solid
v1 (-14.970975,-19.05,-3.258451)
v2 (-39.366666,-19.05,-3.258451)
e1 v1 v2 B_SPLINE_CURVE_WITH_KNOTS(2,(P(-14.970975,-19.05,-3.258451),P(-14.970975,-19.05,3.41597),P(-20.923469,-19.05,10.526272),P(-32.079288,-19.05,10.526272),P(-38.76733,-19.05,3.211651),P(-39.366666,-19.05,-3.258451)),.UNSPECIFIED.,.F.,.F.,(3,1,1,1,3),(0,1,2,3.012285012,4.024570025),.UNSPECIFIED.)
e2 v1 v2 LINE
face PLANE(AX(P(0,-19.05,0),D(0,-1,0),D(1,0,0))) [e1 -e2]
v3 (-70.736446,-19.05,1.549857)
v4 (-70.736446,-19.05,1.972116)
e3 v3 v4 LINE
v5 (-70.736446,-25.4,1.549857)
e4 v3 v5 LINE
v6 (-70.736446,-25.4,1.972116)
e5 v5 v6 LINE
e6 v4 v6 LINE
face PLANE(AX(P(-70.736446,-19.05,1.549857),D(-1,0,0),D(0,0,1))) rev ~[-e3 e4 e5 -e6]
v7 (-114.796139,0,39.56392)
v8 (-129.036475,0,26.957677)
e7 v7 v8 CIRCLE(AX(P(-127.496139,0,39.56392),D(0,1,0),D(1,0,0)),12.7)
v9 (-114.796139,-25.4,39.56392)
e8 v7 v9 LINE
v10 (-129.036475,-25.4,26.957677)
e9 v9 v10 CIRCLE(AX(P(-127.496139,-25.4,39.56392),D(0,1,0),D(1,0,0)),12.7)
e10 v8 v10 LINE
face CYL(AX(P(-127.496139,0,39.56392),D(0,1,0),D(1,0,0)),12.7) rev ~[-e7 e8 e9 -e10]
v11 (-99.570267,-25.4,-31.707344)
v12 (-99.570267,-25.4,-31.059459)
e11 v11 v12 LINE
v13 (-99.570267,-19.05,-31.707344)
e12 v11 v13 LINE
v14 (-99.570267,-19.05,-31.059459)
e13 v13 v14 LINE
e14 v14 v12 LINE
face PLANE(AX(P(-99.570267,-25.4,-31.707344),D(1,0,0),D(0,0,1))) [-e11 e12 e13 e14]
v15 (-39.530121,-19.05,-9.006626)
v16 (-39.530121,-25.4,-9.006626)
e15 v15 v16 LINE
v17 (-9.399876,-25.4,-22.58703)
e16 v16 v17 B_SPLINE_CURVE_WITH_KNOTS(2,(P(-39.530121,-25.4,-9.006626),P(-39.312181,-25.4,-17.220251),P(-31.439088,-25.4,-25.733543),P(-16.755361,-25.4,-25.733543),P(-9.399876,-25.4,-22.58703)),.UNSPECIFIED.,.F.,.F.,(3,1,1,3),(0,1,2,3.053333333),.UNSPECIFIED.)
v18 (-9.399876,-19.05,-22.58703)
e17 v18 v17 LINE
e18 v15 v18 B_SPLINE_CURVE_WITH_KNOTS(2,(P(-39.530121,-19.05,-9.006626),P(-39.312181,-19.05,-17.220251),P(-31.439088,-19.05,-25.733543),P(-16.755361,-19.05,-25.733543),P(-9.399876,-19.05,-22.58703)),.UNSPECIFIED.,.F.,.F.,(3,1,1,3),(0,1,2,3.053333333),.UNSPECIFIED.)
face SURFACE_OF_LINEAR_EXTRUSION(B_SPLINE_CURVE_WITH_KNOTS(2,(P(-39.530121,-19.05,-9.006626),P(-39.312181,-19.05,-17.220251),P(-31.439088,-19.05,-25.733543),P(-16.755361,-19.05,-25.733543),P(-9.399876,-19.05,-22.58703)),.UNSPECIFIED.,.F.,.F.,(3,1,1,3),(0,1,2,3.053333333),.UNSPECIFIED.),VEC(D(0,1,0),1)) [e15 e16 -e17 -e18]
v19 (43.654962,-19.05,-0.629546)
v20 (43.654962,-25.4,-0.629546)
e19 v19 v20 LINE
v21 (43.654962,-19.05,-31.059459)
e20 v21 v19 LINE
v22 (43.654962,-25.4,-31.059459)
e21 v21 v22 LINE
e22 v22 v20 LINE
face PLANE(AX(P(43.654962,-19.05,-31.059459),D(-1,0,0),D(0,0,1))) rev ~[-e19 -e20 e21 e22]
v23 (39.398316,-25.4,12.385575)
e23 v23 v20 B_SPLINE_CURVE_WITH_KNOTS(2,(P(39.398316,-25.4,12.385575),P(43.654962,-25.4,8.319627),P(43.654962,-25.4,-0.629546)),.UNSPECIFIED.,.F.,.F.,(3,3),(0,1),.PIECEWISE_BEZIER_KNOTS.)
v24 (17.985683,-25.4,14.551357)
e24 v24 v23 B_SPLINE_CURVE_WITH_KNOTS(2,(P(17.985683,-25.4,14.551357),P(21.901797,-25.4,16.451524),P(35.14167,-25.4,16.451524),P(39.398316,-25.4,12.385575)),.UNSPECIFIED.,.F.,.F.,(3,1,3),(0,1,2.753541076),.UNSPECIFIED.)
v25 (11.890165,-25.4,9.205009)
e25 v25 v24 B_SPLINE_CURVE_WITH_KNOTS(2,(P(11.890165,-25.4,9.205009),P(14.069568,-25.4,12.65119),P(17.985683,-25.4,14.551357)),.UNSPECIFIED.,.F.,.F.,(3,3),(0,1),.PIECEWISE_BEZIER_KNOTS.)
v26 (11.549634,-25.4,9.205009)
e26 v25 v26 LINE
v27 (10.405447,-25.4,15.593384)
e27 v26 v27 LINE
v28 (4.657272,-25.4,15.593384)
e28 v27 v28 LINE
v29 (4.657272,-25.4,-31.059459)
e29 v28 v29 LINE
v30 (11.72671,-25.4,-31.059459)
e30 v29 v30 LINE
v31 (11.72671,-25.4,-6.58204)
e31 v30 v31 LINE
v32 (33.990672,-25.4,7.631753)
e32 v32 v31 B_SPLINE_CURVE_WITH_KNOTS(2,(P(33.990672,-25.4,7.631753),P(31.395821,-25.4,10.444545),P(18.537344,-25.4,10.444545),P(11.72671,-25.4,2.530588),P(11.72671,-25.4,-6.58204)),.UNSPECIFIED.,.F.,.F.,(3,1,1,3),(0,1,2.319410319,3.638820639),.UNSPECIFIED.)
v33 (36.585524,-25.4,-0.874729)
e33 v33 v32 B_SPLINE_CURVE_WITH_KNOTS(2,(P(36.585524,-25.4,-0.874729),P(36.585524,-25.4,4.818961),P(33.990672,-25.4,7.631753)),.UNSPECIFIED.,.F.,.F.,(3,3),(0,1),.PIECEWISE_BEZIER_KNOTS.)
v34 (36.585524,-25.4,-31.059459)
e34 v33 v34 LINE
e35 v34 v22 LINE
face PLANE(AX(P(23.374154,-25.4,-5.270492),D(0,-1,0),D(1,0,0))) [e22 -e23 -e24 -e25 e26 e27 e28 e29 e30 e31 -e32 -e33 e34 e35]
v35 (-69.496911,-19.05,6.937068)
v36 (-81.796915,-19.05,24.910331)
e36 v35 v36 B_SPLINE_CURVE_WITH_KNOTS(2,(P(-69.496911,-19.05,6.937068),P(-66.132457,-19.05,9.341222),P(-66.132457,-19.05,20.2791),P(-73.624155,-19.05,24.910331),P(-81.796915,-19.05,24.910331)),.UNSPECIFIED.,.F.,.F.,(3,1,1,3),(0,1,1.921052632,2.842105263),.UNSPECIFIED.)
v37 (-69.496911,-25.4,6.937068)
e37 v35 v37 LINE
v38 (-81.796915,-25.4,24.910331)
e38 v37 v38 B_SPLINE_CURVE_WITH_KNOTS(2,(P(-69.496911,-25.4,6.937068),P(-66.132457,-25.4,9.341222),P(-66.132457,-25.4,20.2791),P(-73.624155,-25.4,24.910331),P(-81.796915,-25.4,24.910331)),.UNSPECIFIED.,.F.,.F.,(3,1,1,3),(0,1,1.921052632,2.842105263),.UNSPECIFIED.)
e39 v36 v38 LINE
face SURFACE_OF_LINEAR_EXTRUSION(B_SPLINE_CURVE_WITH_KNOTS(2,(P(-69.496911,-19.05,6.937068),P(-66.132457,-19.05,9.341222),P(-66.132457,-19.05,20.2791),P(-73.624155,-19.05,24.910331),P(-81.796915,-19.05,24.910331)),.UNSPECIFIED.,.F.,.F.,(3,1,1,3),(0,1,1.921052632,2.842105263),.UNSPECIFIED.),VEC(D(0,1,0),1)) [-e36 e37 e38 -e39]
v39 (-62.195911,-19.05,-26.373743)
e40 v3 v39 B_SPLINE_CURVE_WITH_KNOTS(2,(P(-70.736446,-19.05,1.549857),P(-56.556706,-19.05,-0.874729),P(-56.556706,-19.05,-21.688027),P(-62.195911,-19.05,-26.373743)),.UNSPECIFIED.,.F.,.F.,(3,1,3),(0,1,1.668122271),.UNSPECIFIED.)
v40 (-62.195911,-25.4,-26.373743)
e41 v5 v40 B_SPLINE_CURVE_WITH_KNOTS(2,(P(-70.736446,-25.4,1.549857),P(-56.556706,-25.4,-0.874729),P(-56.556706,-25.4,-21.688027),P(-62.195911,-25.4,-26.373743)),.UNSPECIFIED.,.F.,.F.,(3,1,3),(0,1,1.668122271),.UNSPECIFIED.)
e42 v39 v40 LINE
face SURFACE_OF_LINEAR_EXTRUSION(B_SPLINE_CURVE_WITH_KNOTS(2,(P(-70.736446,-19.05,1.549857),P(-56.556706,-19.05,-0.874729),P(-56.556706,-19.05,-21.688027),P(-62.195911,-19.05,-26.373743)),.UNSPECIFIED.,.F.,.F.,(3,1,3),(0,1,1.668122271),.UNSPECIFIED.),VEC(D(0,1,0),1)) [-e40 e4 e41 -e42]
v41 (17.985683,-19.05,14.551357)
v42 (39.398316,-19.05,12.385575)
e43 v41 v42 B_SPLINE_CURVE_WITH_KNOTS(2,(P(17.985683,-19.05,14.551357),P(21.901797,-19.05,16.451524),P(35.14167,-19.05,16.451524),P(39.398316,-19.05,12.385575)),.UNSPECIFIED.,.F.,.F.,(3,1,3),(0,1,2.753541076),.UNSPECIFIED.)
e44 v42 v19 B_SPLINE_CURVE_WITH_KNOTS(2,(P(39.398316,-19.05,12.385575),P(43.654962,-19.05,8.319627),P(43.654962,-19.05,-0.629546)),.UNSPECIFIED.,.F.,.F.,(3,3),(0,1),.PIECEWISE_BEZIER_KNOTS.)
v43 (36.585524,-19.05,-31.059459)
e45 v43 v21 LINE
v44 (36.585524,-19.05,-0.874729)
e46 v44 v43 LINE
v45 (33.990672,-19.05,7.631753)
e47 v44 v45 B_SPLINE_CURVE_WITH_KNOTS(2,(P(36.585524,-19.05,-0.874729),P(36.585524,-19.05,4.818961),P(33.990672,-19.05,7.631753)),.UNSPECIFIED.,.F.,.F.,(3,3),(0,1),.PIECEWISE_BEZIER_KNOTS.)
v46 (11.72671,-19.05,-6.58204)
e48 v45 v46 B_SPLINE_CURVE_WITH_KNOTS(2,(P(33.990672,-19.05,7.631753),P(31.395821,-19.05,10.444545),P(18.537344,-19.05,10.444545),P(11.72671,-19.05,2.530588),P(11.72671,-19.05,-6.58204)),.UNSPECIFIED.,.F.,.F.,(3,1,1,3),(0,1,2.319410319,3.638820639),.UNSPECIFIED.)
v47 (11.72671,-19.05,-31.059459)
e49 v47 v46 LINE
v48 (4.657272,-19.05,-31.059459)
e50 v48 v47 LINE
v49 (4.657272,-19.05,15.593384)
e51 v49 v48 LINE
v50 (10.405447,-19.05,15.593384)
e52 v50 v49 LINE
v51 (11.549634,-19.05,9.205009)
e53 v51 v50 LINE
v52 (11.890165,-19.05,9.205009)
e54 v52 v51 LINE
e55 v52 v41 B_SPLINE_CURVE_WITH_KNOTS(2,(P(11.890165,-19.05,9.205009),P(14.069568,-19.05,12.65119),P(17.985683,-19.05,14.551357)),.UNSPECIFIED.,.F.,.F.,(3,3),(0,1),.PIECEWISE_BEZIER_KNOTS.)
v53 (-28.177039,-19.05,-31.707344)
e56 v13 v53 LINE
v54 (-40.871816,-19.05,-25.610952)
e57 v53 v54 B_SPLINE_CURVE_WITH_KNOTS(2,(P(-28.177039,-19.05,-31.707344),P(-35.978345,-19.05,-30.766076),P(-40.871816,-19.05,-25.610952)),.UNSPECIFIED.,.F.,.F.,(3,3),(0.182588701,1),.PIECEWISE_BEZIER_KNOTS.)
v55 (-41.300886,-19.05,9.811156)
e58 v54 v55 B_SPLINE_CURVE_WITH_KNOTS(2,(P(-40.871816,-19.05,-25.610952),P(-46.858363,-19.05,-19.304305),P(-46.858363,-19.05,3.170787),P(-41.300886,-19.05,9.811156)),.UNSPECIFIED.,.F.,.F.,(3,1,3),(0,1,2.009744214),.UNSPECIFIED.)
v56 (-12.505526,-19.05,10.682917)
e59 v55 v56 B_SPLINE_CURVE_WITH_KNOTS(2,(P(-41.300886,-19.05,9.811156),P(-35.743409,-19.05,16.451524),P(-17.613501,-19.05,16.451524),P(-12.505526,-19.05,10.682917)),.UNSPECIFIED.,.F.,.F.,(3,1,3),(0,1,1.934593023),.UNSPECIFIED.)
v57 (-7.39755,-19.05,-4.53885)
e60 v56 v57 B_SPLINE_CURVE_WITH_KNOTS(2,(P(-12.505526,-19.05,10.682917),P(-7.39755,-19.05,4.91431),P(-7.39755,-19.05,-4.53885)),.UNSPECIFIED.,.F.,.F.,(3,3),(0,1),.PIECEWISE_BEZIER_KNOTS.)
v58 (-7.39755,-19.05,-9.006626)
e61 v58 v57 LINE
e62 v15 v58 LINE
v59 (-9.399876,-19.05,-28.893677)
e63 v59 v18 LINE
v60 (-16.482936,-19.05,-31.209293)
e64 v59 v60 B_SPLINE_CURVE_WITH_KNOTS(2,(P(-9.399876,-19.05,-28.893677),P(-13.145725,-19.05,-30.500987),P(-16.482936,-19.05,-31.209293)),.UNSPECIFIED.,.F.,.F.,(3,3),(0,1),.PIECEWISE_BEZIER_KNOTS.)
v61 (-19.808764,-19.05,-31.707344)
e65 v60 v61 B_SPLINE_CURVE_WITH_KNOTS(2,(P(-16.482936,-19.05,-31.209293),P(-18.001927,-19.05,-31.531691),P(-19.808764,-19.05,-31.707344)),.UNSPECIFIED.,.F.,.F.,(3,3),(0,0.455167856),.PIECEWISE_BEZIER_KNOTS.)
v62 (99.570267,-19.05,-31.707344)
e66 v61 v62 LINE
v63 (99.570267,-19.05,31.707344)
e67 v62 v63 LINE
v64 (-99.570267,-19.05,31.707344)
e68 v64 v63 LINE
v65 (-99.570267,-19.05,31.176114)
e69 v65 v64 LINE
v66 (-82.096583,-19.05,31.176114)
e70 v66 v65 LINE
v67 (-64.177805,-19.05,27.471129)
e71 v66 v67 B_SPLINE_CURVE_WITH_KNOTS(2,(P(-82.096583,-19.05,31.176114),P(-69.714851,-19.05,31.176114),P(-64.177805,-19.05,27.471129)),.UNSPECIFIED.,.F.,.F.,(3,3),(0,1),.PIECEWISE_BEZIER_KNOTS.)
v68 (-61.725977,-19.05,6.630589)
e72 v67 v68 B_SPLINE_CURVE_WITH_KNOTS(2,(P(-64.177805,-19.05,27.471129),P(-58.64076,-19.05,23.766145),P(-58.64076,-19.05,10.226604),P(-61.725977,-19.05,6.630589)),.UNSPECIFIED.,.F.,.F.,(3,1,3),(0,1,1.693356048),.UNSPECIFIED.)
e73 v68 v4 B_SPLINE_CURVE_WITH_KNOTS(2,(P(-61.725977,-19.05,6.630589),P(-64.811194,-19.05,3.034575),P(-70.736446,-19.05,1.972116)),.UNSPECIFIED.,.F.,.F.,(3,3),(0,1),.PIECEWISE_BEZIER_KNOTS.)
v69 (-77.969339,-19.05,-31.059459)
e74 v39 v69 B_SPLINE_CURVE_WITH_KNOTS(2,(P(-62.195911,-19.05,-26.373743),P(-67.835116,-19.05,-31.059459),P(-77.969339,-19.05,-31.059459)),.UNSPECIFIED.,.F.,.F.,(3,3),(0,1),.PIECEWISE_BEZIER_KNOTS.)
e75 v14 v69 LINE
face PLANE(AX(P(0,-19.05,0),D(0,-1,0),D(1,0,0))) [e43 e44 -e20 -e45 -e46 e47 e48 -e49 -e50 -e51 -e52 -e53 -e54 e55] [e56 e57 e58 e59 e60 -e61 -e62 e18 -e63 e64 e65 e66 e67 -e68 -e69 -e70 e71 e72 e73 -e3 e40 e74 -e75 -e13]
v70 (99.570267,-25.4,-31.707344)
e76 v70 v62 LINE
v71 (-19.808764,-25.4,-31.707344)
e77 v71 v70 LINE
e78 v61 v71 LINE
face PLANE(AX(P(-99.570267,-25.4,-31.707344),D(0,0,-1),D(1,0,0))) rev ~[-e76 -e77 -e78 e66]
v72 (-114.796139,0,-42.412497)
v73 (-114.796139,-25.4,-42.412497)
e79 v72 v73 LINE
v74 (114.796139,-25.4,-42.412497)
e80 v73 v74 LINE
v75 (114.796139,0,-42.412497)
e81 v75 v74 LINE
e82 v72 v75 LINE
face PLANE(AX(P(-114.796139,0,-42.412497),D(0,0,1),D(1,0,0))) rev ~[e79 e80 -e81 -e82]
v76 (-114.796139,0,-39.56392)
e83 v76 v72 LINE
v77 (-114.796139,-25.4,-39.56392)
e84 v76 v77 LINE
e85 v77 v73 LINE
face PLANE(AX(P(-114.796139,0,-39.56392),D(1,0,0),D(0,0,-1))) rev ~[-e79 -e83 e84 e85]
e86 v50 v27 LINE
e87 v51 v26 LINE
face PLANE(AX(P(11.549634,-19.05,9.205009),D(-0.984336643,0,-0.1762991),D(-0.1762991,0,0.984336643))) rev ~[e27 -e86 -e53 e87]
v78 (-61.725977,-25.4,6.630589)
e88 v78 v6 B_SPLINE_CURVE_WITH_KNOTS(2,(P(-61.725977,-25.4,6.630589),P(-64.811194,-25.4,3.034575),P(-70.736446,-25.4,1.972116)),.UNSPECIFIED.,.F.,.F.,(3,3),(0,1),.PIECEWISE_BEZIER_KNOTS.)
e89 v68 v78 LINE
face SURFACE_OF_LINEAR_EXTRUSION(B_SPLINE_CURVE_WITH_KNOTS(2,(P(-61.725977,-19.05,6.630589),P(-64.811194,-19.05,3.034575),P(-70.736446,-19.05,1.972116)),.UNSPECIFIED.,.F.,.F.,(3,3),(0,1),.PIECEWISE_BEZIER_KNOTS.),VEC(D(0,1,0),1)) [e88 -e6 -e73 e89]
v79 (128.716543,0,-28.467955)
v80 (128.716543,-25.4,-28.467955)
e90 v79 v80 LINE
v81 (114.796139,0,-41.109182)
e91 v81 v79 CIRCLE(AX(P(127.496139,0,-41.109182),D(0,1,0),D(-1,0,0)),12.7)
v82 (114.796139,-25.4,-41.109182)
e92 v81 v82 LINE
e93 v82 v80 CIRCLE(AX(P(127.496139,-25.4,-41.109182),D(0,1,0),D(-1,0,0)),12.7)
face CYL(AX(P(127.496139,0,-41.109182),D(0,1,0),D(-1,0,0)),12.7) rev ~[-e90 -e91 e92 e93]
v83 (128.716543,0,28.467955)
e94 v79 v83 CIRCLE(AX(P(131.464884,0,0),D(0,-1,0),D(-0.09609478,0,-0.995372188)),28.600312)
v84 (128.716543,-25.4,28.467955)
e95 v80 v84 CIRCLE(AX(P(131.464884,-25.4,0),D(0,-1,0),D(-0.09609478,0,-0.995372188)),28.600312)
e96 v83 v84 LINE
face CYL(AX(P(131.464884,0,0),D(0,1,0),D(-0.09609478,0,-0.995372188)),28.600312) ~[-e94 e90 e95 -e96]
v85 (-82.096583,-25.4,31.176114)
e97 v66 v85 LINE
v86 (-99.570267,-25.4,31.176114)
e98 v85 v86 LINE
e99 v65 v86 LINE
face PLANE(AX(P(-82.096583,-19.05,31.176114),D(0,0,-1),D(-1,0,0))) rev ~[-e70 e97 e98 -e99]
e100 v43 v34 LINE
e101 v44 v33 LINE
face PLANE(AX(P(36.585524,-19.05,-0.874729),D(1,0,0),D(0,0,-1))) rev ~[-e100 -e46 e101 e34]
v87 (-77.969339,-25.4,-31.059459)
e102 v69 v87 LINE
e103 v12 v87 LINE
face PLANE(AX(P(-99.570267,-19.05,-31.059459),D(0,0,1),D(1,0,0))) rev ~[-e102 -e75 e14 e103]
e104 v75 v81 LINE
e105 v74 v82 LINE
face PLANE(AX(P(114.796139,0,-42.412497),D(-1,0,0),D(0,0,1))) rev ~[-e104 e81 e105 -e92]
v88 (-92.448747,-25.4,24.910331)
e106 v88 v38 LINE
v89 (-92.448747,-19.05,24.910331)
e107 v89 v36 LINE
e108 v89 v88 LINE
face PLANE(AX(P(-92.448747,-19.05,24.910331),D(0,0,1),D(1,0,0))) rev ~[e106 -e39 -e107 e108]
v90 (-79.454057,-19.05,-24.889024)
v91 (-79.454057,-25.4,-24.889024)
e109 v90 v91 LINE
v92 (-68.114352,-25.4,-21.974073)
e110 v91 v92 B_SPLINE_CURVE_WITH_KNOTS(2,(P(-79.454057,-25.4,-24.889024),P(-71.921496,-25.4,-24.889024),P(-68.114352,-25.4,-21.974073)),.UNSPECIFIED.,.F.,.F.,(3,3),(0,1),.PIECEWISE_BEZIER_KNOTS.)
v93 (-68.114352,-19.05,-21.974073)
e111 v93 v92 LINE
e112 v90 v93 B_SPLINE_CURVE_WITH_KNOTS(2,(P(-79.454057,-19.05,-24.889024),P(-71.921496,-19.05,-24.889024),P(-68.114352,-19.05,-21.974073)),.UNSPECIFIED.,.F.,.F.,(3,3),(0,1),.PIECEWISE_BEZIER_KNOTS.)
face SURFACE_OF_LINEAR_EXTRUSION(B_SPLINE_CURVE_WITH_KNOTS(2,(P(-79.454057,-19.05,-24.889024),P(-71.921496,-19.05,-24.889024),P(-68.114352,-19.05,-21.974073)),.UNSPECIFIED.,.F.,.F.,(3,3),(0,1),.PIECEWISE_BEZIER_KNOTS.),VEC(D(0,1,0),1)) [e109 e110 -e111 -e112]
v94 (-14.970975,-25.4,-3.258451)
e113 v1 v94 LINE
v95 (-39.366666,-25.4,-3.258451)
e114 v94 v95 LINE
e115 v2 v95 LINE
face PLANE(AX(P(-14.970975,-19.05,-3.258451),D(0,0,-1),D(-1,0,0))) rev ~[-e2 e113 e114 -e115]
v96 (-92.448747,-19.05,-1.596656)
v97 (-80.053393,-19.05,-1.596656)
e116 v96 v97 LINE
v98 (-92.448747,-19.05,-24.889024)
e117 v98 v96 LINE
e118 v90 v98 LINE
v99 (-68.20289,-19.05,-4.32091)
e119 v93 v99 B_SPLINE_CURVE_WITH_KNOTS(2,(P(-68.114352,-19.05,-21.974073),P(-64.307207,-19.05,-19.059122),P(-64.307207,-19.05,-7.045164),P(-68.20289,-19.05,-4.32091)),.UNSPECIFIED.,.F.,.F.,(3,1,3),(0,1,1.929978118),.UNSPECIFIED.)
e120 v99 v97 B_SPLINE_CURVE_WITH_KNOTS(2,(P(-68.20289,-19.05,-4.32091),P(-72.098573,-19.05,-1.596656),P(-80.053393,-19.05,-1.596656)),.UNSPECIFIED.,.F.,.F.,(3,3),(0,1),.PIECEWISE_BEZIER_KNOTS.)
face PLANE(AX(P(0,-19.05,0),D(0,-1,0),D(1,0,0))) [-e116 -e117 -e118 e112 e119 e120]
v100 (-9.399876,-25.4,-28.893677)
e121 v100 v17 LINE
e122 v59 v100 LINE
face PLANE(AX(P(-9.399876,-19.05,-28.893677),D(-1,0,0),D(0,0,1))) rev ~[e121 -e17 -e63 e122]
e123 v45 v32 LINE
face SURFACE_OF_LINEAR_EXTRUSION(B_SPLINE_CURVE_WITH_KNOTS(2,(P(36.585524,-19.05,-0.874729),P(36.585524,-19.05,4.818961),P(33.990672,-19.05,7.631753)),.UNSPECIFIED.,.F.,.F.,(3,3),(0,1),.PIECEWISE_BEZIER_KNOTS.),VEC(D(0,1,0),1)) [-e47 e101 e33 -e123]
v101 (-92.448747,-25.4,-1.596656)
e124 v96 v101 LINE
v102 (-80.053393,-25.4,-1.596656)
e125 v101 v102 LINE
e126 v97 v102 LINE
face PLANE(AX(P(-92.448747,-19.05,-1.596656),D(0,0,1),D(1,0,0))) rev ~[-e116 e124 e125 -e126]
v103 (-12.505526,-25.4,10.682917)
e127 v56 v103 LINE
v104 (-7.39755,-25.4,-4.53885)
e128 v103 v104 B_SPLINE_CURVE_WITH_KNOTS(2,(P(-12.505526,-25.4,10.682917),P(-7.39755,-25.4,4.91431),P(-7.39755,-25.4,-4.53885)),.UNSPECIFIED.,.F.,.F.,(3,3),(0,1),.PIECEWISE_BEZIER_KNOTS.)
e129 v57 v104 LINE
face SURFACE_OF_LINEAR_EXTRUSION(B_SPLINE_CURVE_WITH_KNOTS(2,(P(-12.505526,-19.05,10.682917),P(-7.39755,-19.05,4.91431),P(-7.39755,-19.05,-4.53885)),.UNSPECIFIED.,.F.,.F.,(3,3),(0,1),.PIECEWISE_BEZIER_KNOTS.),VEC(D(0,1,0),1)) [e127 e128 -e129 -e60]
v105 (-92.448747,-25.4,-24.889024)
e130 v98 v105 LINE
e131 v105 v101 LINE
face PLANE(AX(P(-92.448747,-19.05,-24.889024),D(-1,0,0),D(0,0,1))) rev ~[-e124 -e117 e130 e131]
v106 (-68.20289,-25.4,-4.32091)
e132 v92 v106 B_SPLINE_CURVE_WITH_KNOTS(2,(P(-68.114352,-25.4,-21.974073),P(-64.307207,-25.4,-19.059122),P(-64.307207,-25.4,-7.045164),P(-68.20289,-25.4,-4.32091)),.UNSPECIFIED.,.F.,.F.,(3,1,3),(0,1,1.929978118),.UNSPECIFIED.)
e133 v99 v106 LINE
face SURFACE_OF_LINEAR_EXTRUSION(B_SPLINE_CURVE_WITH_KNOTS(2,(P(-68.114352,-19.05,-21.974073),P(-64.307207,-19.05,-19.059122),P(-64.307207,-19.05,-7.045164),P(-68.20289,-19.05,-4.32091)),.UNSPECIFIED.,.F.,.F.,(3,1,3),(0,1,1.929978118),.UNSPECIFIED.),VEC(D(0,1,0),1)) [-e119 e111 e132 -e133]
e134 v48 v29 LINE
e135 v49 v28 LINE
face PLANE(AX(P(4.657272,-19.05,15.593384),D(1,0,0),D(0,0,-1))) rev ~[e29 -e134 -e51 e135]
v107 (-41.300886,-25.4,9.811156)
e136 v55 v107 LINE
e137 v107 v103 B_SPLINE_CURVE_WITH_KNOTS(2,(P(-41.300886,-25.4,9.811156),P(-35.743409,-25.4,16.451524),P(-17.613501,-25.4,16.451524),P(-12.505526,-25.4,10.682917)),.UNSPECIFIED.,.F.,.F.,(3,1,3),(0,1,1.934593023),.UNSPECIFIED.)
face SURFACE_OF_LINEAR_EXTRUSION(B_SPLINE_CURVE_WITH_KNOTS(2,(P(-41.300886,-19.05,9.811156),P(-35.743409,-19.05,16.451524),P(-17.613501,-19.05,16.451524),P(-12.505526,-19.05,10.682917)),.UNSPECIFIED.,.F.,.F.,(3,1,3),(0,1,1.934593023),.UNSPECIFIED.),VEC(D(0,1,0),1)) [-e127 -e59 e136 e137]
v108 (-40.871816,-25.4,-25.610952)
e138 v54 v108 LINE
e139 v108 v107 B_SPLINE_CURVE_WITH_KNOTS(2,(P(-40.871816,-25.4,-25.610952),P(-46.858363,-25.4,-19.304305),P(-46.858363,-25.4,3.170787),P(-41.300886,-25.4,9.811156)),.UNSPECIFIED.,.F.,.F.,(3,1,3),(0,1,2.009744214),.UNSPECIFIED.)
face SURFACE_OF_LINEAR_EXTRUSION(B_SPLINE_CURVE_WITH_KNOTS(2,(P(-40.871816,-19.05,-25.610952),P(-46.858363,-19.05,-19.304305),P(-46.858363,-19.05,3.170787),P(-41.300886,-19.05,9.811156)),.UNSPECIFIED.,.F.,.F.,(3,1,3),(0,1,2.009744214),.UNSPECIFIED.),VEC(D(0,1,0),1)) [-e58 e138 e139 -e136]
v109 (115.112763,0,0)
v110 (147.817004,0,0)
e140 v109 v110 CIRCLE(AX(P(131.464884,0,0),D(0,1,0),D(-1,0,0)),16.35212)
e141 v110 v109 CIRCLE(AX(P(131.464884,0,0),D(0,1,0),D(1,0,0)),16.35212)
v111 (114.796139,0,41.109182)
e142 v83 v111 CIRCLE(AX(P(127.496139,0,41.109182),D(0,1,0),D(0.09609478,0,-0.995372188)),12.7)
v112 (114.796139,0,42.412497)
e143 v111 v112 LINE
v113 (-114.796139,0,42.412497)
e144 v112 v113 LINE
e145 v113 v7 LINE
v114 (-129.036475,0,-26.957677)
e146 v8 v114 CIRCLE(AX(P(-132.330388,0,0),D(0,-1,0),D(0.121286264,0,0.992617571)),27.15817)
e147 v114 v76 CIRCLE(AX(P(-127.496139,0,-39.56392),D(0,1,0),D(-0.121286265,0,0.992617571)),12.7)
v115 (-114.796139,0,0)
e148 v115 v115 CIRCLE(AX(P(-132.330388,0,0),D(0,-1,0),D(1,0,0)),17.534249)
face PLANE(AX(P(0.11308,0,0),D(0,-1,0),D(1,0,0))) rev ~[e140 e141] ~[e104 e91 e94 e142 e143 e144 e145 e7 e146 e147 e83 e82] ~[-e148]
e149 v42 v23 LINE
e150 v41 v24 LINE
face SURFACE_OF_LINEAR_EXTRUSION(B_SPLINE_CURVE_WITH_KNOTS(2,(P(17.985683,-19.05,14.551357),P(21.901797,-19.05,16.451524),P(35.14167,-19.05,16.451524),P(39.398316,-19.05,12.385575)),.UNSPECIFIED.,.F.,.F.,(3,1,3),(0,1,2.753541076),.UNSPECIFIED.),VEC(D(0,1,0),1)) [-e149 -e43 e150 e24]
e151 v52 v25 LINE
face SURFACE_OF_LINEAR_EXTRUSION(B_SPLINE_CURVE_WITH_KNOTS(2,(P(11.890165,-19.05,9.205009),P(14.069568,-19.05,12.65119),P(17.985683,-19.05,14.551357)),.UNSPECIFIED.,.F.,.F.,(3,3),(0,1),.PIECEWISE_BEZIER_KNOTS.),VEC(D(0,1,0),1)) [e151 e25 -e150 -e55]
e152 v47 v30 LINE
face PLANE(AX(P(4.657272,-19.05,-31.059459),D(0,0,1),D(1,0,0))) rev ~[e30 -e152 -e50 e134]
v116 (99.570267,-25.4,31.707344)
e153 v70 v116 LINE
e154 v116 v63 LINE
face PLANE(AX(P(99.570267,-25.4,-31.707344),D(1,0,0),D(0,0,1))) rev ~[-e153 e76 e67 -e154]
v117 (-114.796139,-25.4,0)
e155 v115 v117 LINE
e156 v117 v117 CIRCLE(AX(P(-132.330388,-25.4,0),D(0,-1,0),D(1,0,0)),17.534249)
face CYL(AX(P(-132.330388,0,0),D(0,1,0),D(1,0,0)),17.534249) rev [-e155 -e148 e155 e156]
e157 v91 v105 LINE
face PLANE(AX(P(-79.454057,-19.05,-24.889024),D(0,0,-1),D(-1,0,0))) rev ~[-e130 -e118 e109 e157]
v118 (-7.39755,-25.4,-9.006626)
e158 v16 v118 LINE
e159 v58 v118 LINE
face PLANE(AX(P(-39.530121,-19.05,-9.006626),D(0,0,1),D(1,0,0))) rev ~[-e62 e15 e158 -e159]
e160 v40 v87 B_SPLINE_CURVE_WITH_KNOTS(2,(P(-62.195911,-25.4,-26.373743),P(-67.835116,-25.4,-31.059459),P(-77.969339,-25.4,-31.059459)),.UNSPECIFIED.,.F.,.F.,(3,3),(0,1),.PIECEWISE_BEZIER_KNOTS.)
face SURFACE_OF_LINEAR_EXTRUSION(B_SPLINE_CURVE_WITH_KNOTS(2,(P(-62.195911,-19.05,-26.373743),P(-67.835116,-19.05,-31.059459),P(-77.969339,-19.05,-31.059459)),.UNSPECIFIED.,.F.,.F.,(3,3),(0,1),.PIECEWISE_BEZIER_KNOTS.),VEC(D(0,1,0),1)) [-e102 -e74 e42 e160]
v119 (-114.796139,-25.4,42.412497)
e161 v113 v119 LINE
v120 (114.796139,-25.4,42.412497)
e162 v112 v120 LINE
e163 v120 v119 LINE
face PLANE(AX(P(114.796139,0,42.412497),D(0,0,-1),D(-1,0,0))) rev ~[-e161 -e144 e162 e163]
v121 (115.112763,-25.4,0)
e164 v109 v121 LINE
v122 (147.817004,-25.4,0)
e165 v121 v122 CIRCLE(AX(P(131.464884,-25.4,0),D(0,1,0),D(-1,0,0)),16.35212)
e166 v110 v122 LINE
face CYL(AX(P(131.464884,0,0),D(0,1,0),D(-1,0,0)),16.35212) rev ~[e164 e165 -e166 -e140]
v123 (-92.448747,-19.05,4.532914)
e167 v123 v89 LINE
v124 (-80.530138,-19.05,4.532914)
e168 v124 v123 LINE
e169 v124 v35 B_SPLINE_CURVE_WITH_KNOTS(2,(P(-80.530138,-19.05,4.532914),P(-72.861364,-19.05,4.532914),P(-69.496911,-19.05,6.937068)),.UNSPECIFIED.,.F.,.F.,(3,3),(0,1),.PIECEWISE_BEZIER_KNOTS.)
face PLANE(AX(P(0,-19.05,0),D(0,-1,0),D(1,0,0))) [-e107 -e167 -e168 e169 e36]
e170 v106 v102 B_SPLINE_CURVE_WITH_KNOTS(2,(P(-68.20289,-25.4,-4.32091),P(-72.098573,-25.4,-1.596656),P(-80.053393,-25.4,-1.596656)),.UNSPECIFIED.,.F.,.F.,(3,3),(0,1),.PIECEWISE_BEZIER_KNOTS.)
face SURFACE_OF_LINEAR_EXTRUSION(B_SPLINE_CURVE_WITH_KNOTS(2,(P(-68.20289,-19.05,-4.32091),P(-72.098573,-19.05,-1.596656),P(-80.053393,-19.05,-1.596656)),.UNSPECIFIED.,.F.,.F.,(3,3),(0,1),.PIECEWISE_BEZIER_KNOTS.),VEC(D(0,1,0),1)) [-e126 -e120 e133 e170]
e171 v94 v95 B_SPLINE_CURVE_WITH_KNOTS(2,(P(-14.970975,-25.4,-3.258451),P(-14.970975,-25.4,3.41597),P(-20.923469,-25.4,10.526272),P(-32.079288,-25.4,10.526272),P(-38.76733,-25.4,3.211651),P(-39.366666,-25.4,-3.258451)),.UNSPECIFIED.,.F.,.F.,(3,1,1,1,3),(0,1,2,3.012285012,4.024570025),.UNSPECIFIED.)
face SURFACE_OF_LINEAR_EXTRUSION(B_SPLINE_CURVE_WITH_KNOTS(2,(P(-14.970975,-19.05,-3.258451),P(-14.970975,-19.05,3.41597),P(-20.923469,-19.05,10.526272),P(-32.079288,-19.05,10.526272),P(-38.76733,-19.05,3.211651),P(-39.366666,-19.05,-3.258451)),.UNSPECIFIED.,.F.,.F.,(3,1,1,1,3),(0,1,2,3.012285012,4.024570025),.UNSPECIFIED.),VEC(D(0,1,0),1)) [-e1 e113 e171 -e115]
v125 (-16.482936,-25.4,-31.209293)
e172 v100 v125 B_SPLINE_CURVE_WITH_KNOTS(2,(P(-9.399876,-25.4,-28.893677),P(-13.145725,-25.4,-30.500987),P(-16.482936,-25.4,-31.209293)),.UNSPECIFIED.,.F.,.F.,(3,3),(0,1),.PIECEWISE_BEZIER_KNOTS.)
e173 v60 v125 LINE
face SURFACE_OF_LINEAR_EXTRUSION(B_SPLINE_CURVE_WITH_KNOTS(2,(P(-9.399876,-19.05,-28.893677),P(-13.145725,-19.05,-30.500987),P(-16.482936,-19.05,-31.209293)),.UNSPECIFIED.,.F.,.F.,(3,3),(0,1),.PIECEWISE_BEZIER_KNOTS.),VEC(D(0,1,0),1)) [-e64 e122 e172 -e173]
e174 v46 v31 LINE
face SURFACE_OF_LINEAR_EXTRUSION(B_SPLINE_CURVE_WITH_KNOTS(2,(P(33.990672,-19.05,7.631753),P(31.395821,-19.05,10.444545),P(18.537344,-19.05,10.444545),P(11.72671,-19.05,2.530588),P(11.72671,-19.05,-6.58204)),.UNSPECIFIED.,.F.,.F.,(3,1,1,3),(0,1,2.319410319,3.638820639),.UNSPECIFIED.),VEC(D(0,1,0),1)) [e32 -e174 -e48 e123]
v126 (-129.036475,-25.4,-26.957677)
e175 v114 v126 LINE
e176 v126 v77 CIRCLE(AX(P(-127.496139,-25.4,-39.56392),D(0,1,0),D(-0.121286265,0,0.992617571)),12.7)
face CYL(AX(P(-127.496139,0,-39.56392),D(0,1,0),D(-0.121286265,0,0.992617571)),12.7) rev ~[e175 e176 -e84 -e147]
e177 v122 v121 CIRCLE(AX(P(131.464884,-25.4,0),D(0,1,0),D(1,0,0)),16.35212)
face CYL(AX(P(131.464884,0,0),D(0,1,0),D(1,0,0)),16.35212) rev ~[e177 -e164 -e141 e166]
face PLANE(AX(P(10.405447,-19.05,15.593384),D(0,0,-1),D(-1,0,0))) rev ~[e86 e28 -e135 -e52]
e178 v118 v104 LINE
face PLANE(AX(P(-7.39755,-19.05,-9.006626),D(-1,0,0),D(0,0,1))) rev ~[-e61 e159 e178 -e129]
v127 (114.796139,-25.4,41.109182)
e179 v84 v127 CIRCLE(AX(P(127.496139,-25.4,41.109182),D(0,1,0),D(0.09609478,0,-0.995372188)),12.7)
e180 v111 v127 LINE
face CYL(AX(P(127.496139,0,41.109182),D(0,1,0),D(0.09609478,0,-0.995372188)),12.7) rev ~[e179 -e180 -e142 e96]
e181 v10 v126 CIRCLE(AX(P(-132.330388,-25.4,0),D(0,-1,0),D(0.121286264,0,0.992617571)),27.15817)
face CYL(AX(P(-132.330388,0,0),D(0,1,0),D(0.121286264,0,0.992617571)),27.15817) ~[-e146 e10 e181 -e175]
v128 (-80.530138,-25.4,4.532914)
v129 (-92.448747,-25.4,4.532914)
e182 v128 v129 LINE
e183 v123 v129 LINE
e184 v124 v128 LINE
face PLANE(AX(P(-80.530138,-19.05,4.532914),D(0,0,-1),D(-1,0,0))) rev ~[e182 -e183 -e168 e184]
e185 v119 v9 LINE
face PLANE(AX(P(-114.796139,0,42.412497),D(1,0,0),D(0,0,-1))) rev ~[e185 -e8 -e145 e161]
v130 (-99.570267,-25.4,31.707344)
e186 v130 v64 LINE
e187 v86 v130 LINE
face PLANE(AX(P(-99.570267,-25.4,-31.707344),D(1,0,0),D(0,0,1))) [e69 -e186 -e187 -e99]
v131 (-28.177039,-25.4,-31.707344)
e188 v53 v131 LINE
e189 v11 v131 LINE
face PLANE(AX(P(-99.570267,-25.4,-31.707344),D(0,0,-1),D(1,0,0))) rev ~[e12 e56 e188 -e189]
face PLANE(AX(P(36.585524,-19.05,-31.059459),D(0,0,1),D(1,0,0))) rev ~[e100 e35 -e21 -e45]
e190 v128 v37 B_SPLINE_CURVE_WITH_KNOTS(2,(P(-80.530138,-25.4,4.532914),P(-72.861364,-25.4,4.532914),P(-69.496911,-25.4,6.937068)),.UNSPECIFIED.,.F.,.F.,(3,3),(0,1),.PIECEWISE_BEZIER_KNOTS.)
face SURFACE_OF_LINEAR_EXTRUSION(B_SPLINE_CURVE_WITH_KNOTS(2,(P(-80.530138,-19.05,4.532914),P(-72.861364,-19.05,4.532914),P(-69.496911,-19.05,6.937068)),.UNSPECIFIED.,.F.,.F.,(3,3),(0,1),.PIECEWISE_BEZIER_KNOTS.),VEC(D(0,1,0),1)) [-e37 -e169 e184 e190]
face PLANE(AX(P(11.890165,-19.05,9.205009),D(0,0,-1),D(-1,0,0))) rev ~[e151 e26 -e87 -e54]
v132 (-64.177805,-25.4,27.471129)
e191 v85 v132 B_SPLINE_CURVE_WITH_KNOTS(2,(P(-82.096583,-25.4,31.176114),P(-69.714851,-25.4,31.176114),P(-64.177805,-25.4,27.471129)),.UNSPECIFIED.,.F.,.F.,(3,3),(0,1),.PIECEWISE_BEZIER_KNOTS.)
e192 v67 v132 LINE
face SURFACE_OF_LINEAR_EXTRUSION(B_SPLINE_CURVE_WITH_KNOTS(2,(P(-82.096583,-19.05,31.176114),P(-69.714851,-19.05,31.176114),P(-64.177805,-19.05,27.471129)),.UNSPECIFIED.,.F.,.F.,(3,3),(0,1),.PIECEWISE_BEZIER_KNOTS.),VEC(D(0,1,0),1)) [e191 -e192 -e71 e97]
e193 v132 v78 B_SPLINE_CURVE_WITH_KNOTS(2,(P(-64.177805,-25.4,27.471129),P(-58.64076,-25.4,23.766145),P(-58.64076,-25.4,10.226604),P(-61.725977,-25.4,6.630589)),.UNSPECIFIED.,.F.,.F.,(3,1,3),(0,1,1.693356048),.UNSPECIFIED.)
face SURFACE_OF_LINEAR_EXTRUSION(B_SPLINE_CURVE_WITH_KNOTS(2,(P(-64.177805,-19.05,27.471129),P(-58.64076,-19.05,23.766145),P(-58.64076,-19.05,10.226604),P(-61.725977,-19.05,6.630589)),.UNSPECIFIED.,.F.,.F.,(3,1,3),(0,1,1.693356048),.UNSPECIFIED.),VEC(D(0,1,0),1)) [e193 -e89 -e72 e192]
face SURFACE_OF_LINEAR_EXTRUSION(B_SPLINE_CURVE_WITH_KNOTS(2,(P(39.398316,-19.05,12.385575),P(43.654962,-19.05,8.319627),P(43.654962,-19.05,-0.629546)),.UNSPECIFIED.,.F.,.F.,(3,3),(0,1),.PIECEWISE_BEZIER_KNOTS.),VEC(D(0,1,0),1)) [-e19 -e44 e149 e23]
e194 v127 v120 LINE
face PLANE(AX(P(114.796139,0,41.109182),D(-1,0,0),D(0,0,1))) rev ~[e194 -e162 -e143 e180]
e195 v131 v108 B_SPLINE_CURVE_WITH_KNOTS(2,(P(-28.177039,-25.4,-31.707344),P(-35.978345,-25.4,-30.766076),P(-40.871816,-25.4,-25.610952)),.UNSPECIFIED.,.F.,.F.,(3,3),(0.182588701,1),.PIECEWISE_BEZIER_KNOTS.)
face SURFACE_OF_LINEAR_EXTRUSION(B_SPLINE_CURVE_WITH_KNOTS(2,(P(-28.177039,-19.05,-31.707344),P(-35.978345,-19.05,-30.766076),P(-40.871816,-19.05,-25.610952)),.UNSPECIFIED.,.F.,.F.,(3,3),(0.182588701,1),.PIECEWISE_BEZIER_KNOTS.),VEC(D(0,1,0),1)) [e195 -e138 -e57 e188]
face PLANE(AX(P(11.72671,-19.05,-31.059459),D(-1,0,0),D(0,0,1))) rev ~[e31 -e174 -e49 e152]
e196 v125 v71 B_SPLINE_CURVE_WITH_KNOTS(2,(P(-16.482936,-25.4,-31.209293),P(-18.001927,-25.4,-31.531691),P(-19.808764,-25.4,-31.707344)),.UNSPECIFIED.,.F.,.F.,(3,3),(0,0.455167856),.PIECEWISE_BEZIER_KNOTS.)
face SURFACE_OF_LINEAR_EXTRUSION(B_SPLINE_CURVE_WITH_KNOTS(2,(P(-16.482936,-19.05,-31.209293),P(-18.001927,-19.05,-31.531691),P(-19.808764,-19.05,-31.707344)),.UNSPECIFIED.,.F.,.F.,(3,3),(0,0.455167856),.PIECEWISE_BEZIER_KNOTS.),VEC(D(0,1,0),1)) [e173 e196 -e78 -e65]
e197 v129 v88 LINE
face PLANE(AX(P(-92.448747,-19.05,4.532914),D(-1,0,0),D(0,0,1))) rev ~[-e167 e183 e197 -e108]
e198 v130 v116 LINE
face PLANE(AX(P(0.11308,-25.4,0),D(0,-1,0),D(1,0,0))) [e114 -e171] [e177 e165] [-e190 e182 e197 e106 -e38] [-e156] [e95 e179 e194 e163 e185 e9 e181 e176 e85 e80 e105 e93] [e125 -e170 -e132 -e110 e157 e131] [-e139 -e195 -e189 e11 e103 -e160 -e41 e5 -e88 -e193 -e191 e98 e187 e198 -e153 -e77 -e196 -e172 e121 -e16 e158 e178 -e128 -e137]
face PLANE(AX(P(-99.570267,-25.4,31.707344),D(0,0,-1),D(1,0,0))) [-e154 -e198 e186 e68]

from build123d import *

# Parameters (mm, degrees)
F0_R     = 17.5342485309
F0_W     = 208.0285698175
F0_H     = 60.8816854656
F1_DEPTH = 25.4
F2_W     = 199.1405338049
F2_H     = 63.4146874705
F3_DEPTH = 6.35
F6_DEPTH = 6.35


with BuildPart() as f1:
    # F0 (on Front) → F1 (new body)
    with BuildSketch(Plane.XZ):
        with BuildLine():
            Line((114.7961392999, 41.1091820392), (114.7961392999, 42.4124971032))
            Line((114.7961392999, 42.4124971032), (-114.7961392999, 42.4124971032))
            Line((-114.7961392999, 42.4124971032), (-114.7961392999, 39.5639197406))
            ThreePointArc((-114.7961392999, 39.5639197406), (-119.0780712792, 30.0546542169), (-129.0364748589, 26.9576765903))
            ThreePointArc((-129.0364748589, 26.9576765903), (-159.4885576846, 0), (-129.0364748589, -26.9576765903))
            ThreePointArc((-129.0364748589, -26.9576765903), (-119.0780712792, -30.0546542169), (-114.7961392999, -39.5639197406))
            Line((-114.7961392999, -39.5639197406), (-114.7961392999, -42.4124971032))
            Line((-114.7961392999, -42.4124971032), (114.7961392999, -42.4124971032))
            Line((114.7961392999, -42.4124971032), (114.7961392999, -41.1091820392))
            ThreePointArc((114.7961392999, -41.1091820392), (118.9582568629, -31.7073437353), (128.7165429996, -28.4679552471))
            ThreePointArc((128.7165429996, -28.4679552471), (160.0651957896, 0), (128.7165429996, 28.4679552471))
            ThreePointArc((128.7165429996, 28.4679552471), (118.9582568629, 31.7073437353), (114.7961392999, 41.1091820392))
        make_face()
        with Locations((-132.3303878307, 0)):
            Circle(F0_R, mode=Mode.SUBTRACT)
        Rectangle(F0_W, F0_H, mode=Mode.SUBTRACT)
        with BuildLine():
            ThreePointArc((115.1127634511, 0), (131.4648836851, 16.352120234), (147.8170039192, 0))
            ThreePointArc((147.8170039192, 0), (131.4648836851, -16.352120234), (115.1127634511, 0))
        make_face(mode=Mode.SUBTRACT)
        Rectangle(F0_W, F0_H)
    extrude(amount=F1_DEPTH)

    # F2 (on face) → F3 (cut)
    with BuildSketch(Plane.XZ.offset(25.4)):
        Rectangle(F2_W, F2_H)
    extrude(amount=-F3_DEPTH, mode=Mode.SUBTRACT)

    # F4 (on face) → F6 (join)
    with BuildSketch(Plane.XZ.offset(19.05)):
        with BuildLine():
            Line((36.5855240286, -0.8747291355), (36.5855240286, -31.0594588518))
            Line((36.5855240286, -31.0594588518), (43.6549620804, -31.0594588518))
            Line((43.6549620804, -31.0594588518), (43.6549620804, -0.6295463129))
            add(Edge.make_bspline(
                [(39.3983158546, 12.3855751871), (43.6549620804, 8.3196267123), (43.6549620804, -0.6295463129)],
                knots=[0, 0, 0, 1, 1, 1], degree=2))
            add(Edge.make_bspline(
                [(26.7101047848, 16.451523662), (35.1416696288, 16.451523662), (39.3983158546, 12.3855751871)],
                knots=[0, 0, 0, 1, 1, 1], degree=2))
            add(Edge.make_bspline(
                [(17.9856826804, 14.5513567868), (21.9017972081, 16.451523662), (26.7101047848, 16.451523662)],
                knots=[0, 0, 0, 1, 1, 1], degree=2))
            add(Edge.make_bspline(
                [(11.890165285, 9.2050091272), (14.0695681526, 12.6511899116), (17.9856826804, 14.5513567868)],
                knots=[0, 0, 0, 1, 1, 1], degree=2))
            Line((11.890165285, 9.2050091272), (11.549633587, 9.2050091272))
            Line((11.549633587, 9.2050091272), (10.4054470815, 15.5933837829))
            Line((10.4054470815, 15.5933837829), (4.6572720182, 15.5933837829))
            Line((4.6572720182, 15.5933837829), (4.6572720182, -31.0594588518))
            Line((4.6572720182, -31.0594588518), (11.72671007, -31.0594588518))
            Line((11.72671007, -31.0594588518), (11.72671007, -6.582040395))
            add(Edge.make_bspline(
                [(15.1320270506, 6.4875661767), (11.72671007, 2.5305878452), (11.72671007, -6.582040395)],
                knots=[0, 0, 0, 1, 1, 1], degree=2))
            add(Edge.make_bspline(
                [(25.8519649056, 10.4445445082), (18.5373440312, 10.4445445082), (15.1320270506, 6.4875661767)],
                knots=[0, 0, 0, 1, 1, 1], degree=2))
            add(Edge.make_bspline(
                [(33.9906724894, 7.6317526822), (31.3958209501, 10.4445445082), (25.8519649056, 10.4445445082)],
                knots=[0, 0, 0, 1, 1, 1], degree=2))
            add(Edge.make_bspline(
                [(36.5855240286, -0.8747291355), (36.5855240286, 4.8189608562), (33.9906724894, 7.6317526822)],
                knots=[0, 0, 0, 1, 1, 1], degree=2))
        make_face()
        with BuildLine():
            Line((-82.0965833805, 31.1761142863), (-99.5702669024, 31.1761142863))
            Line((-99.5702669024, 31.1761142863), (-99.5702669024, -31.0594588518))
            Line((-99.5702669024, -31.0594588518), (-77.9693392, -31.0594588518))
            add(Edge.make_bspline(
                [(-62.1959109457, -26.3737426865), (-67.8351158656, -31.0594588518), (-77.9693392, -31.0594588518)],
                knots=[0, 0, 0, 1, 1, 1], degree=2))
            add(Edge.make_bspline(
                [(-56.5567060258, -13.3518105525), (-56.5567060258, -21.6880265211), (-62.1959109457, -26.3737426865)],
                knots=[0, 0, 0, 1, 1, 1], degree=2))
            add(Edge.make_bspline(
                [(-70.7364459331, 1.5498565548), (-56.5567060258, -0.8747291355), (-56.5567060258, -13.3518105525)],
                knots=[0, 0, 0, 1, 1, 1], degree=2))
            Line((-70.7364459331, 1.5498565548), (-70.7364459331, 1.9721158604))
            add(Edge.make_bspline(
                [(-61.7259772024, 6.6305894899), (-64.8111943868, 3.0345747583), (-70.7364459331, 1.9721158604)],
                knots=[0, 0, 0, 1, 1, 1], degree=2))
            add(Edge.make_bspline(
                [(-58.6407600179, 15.7704602659), (-58.6407600179, 10.2266042214), (-61.7259772024, 6.6305894899)],
                knots=[0, 0, 0, 1, 1, 1], degree=2))
            add(Edge.make_bspline(
                [(-64.1778054284, 27.4711294114), (-58.6407600179, 23.7661445364), (-58.6407600179, 15.7704602659)],
                knots=[0, 0, 0, 1, 1, 1], degree=2))
            add(Edge.make_bspline(
                [(-82.0965833805, 31.1761142863), (-69.7148508389, 31.1761142863), (-64.1778054284, 27.4711294114)],
                knots=[0, 0, 0, 1, 1, 1], degree=2))
        make_face()
        with BuildLine():
            Line((-92.4487470017, -24.8890244829), (-92.4487470017, -1.5966563354))
            Line((-92.4487470017, -1.5966563354), (-80.0533931921, -1.5966563354))
            add(Edge.make_bspline(
                [(-68.2028900995, -4.3209099199), (-72.0985727254, -1.5966563354), (-80.0533931921, -1.5966563354)],
                knots=[0, 0, 0, 1, 1, 1], degree=2))
            add(Edge.make_bspline(
                [(-64.3072074737, -12.8342023714), (-64.3072074737, -7.0451635044), (-68.2028900995, -4.3209099199)],
                knots=[0, 0, 0, 1, 1, 1], degree=2))
            add(Edge.make_bspline(
                [(-68.114351858, -21.9740731475), (-64.3072074737, -19.0591218121), (-64.3072074737, -12.8342023714)],
                knots=[0, 0, 0, 1, 1, 1], degree=2))
            add(Edge.make_bspline(
                [(-79.4540574036, -24.8890244829), (-71.9214962424, -24.8890244829), (-68.114351858, -21.9740731475)],
                knots=[0, 0, 0, 1, 1, 1], degree=2))
            Line((-79.4540574036, -24.8890244829), (-92.4487470017, -24.8890244829))
        make_face(mode=Mode.SUBTRACT)
        with BuildLine():
            Line((-80.5301375694, 4.5329142298), (-92.4487470017, 4.5329142298))
            Line((-92.4487470017, 4.5329142298), (-92.4487470017, 24.9103310419))
            Line((-92.4487470017, 24.9103310419), (-81.7969154862, 24.9103310419))
            add(Edge.make_bspline(
                [(-69.878306054, 22.5947154951), (-73.6241547327, 24.9103310419), (-81.7969154862, 24.9103310419)],
                knots=[0, 0, 0, 1, 1, 1], degree=2))
            add(Edge.make_bspline(
                [(-66.1324573753, 15.0349117981), (-66.1324573753, 20.2790999483), (-69.878306054, 22.5947154951)],
                knots=[0, 0, 0, 1, 1, 1], degree=2))
            add(Edge.make_bspline(
                [(-69.4969105522, 6.9370680181), (-66.1324573753, 9.3412218065), (-66.1324573753, 15.0349117981)],
                knots=[0, 0, 0, 1, 1, 1], degree=2))
            add(Edge.make_bspline(
                [(-80.5301375694, 4.5329142298), (-72.861363729, 4.5329142298), (-69.4969105522, 6.9370680181)],
                knots=[0, 0, 0, 1, 1, 1], degree=2))
        make_face(mode=Mode.SUBTRACT)
        with BuildLine():
            add(Edge.make_bspline(
                [(-28.1770388712, -31.7073437353), (-35.9783446463, -30.7660762397), (-40.8718160129, -25.6109516828)],
                knots=[0.1825887008, 0.1825887008, 0.1825887008, 1, 1, 1], degree=2))
            Line((-28.1770388712, -31.7073437353), (-19.8087642709, -31.7073437353))
            add(Edge.make_bspline(
                [(-16.4829357976, -31.209292799), (-18.0019268098, -31.5316908913), (-19.8087642709, -31.7073437353)],
                knots=[0, 0, 0, 0.4551678559, 0.4551678559, 0.4551678559], degree=2))
            add(Edge.make_bspline(
                [(-9.3998764779, -28.8936772521), (-13.1457251566, -30.500986867), (-16.4829357976, -31.209292799)],
                knots=[0, 0, 0, 1, 1, 1], degree=2))
            Line((-9.3998764779, -28.8936772521), (-9.3998764779, -22.587030204))
            add(Edge.make_bspline(
                [(-24.2879223172, -25.7335430941), (-16.7553611561, -25.7335430941), (-9.3998764779, -22.587030204)],
                knots=[0, 0, 0, 1, 1, 1], degree=2))
            add(Edge.make_bspline(
                [(-35.3756344062, -21.4768968683), (-31.4390879766, -25.7335430941), (-24.2879223172, -25.7335430941)],
                knots=[0, 0, 0, 1, 1, 1], degree=2))
            add(Edge.make_bspline(
                [(-39.5301211226, -9.0066260852), (-39.3121808358, -17.2202506425), (-35.3756344062, -21.4768968683)],
                knots=[0, 0, 0, 1, 1, 1], degree=2))
            Line((-39.5301211226, -9.0066260852), (-7.3975500933, -9.0066260852))
            Line((-7.3975500933, -9.0066260852), (-7.3975500933, -4.5388502066))
            add(Edge.make_bspline(
                [(-12.5055255642, 10.6829166968), (-7.3975500933, 4.9143097316), (-7.3975500933, -4.5388502066)],
                knots=[0, 0, 0, 1, 1, 1], degree=2))
            add(Edge.make_bspline(
                [(-26.3719763094, 16.451523662), (-17.6135010352, 16.451523662), (-12.5055255642, 10.6829166968)],
                knots=[0, 0, 0, 1, 1, 1], degree=2))
            add(Edge.make_bspline(
                [(-41.3008859525, 9.8111555498), (-35.7434086401, 16.451523662), (-26.3719763094, 16.451523662)],
                knots=[0, 0, 0, 1, 1, 1], degree=2))
            add(Edge.make_bspline(
                [(-46.8583632649, -8.1212436702), (-46.8583632649, 3.1707874375), (-41.3008859525, 9.8111555498)],
                knots=[0, 0, 0, 1, 1, 1], degree=2))
            add(Edge.make_bspline(
                [(-40.8718160129, -25.6109516828), (-46.8583632649, -19.3043046347), (-46.8583632649, -8.1212436702)],
                knots=[0, 0, 0, 1, 1, 1], degree=2))
        make_face()
        with BuildLine():
            add(Edge.make_bspline(
                [(-26.4673251849, 10.5262721157), (-32.0792875689, 10.5262721157), (-35.4233088439, 6.8689616785)],
                knots=[0, 0, 0, 1, 1, 1], degree=2))
            add(Edge.make_bspline(
                [(-17.9472220993, 6.9711211879), (-20.9234691404, 10.5262721157), (-26.4673251849, 10.5262721157)],
                knots=[0, 0, 0, 1, 1, 1], degree=2))
            add(Edge.make_bspline(
                [(-14.9709750582, -3.2584510219), (-14.9709750582, 3.4159702601), (-17.9472220993, 6.9711211879)],
                knots=[0, 0, 0, 1, 1, 1], degree=2))
            Line((-14.9709750582, -3.2584510219), (-39.3666659075, -3.2584510219))
            add(Edge.make_bspline(
                [(-35.4233088439, 6.8689616785), (-38.7673301189, 3.2116512413), (-39.3666659075, -3.2584510219)],
                knots=[0, 0, 0, 1, 1, 1], degree=2))
        make_face(mode=Mode.SUBTRACT)
    extrude(amount=F6_DEPTH)


solid = f1.part
